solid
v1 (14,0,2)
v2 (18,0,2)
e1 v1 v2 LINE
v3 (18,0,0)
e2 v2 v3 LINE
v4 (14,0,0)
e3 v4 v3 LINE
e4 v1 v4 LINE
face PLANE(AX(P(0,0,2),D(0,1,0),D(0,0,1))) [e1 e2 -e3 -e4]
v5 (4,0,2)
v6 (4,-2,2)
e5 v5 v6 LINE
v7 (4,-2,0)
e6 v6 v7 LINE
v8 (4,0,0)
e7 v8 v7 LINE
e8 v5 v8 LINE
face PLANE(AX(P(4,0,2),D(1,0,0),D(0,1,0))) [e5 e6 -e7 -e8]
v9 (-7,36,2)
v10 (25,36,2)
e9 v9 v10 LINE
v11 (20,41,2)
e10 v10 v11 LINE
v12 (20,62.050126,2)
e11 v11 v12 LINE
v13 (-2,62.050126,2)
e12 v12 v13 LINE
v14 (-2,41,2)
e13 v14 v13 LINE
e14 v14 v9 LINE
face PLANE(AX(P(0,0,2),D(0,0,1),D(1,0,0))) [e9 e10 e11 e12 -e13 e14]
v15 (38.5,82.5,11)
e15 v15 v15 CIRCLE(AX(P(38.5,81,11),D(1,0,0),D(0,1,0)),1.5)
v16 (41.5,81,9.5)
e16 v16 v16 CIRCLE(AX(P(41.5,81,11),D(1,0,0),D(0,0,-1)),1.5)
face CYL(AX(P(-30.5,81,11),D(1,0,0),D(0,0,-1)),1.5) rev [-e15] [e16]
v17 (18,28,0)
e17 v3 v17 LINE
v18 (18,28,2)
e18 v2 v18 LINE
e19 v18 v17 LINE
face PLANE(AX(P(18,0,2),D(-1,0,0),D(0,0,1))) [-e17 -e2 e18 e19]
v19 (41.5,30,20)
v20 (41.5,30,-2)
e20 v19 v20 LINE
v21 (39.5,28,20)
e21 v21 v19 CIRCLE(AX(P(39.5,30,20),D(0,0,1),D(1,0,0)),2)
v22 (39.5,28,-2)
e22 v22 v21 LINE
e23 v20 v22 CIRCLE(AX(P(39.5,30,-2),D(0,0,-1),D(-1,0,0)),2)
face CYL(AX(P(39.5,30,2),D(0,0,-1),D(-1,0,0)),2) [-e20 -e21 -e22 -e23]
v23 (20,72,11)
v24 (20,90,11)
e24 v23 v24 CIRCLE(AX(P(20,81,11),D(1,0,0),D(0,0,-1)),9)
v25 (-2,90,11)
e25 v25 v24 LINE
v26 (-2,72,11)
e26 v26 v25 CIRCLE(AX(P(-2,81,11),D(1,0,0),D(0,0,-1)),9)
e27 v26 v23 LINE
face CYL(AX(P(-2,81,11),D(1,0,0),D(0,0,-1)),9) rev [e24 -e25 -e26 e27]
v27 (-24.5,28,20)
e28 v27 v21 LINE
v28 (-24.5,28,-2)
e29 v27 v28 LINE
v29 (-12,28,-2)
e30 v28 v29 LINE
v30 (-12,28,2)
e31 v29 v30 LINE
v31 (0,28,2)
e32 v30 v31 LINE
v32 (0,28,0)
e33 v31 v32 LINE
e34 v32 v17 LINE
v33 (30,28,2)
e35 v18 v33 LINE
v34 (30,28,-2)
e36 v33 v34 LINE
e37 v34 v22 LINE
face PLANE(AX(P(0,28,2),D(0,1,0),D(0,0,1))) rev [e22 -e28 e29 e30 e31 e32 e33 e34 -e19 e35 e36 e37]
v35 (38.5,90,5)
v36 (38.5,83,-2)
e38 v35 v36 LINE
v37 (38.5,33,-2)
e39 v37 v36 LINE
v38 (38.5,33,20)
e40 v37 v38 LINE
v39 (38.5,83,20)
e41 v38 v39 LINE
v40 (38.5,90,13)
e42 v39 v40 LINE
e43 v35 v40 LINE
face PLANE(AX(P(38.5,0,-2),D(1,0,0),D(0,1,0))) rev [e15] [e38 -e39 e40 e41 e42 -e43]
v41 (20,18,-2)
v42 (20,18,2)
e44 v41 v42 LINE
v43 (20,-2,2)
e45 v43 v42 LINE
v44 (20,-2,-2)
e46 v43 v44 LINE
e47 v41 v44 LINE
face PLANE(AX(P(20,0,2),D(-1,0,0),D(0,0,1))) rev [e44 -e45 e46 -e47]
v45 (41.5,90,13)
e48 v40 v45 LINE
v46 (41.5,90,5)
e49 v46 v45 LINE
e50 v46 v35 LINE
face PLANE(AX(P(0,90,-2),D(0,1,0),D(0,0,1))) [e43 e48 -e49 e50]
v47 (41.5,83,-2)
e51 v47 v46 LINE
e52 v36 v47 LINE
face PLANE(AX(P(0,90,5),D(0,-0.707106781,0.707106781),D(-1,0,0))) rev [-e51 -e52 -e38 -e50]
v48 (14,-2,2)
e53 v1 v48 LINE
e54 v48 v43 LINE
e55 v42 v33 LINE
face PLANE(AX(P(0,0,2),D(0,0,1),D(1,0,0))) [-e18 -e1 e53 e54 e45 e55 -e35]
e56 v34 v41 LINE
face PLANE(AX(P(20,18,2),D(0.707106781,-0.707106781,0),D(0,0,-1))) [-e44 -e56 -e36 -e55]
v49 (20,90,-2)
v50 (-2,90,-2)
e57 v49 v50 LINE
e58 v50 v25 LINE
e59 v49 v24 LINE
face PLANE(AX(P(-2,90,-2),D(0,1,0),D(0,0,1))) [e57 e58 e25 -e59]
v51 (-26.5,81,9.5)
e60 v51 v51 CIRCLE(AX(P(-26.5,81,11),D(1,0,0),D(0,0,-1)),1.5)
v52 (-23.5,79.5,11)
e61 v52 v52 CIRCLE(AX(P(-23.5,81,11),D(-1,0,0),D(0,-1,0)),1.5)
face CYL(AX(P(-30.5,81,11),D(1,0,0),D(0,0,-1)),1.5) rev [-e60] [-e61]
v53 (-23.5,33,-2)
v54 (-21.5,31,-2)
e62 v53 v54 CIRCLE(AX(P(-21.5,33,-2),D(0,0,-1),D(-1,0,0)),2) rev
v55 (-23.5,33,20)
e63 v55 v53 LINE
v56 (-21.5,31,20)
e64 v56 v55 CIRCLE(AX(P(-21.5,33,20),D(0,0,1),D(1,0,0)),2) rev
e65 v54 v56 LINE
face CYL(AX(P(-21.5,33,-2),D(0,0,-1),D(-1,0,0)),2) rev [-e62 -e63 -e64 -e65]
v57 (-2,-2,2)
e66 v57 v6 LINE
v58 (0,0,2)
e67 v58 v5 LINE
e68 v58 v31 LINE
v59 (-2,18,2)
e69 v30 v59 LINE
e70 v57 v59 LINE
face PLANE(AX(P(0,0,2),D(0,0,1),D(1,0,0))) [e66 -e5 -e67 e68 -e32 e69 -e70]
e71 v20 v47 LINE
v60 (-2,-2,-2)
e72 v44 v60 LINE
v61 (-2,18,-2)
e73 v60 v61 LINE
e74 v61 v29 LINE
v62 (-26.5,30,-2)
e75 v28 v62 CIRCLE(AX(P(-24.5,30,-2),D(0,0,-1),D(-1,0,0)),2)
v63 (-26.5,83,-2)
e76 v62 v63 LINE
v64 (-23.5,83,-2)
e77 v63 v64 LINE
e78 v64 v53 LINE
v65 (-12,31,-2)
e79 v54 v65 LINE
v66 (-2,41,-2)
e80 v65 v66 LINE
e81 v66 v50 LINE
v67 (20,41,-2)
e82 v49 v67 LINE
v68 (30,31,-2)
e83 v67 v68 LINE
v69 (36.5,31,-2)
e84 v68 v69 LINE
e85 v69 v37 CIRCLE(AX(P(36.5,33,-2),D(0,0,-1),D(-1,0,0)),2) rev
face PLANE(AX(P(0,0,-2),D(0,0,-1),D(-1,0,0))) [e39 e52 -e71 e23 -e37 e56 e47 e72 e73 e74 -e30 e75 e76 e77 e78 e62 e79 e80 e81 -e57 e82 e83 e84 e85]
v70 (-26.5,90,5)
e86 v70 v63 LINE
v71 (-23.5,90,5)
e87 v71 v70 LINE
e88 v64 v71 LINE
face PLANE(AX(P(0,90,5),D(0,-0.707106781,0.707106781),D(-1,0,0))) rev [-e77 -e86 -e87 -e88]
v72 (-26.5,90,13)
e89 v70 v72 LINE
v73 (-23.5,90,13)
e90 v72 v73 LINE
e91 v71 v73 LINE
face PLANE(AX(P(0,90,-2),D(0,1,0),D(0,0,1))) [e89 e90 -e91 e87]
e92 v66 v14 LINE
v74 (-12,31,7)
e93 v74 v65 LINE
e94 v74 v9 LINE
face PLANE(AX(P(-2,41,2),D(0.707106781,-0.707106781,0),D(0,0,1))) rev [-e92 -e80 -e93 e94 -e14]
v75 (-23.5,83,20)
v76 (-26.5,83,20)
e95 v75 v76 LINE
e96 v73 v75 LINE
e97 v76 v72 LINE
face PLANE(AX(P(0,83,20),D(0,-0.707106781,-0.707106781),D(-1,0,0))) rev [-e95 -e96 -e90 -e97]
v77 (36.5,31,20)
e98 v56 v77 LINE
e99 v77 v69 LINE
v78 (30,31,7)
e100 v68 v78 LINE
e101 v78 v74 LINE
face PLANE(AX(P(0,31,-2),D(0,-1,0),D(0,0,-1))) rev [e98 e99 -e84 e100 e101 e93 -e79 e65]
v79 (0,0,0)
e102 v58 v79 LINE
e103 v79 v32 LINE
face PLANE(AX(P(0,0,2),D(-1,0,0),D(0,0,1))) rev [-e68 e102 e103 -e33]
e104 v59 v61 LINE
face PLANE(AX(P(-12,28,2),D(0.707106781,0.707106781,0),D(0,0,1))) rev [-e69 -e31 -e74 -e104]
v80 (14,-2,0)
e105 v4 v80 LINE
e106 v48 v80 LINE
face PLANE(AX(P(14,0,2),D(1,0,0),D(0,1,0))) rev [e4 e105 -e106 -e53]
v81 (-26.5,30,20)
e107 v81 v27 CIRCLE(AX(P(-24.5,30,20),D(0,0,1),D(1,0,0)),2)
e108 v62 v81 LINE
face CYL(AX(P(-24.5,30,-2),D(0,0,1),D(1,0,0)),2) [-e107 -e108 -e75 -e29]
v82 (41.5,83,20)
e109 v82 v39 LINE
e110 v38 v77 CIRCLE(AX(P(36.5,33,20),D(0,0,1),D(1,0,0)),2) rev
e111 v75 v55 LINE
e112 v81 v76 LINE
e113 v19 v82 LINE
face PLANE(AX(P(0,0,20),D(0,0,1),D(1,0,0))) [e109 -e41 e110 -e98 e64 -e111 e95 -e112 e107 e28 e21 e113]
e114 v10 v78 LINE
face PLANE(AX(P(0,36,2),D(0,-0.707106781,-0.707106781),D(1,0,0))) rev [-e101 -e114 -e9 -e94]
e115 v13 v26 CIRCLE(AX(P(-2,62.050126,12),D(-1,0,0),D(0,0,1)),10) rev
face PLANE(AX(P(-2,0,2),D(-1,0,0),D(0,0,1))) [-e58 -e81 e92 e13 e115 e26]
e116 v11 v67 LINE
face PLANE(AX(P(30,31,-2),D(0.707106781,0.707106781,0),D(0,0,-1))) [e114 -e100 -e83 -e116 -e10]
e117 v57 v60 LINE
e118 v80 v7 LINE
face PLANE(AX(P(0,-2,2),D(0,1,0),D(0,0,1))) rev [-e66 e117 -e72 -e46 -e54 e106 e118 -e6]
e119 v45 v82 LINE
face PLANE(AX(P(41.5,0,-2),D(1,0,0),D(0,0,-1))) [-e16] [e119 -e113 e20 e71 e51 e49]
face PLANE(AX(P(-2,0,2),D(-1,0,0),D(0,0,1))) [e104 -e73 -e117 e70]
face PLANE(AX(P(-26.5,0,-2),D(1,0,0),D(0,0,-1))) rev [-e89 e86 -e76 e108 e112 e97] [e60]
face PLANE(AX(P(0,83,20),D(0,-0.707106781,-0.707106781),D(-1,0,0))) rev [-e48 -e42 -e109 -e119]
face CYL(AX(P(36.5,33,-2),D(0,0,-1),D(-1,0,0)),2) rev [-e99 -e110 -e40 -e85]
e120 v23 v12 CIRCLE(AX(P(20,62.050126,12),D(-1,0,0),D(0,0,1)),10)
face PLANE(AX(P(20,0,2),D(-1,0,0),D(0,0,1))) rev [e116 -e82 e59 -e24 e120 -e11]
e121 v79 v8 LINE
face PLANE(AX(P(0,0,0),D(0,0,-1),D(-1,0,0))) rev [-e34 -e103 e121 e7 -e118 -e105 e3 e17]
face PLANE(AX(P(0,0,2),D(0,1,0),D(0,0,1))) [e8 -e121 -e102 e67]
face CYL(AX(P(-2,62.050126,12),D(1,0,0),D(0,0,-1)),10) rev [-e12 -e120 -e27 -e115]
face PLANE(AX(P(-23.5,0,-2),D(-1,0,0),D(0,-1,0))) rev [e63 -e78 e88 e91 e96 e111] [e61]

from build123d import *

# Parameters (mm, degrees)
BOSS_EXTRUDE1_DEPTH      = 2
SKETCH2_W                = 22
SKETCH2_H                = 32
BOSS_EXTRUDE2_DEPTH      = 2
BOSS_EXTRUDE3_DEPTH      = 2
BOSS_EXTRUDE3_DEPTH_BACK = 2
SKETCH3_W                = 22
SKETCH3_H                = 60
BOSS_EXTRUDE4_DEPTH      = 18
BOSS_EXTRUDE4_DEPTH_BACK = 4
SKETCH4_W                = 21.5
SKETCH4_H                = 3
SKETCH4_W_2              = 18.5
SKETCH4_W_3              = 3
SKETCH4_H_2              = 59
BOSS_EXTRUDE5_DEPTH      = 22
FILLET1_R                = 10
CHAMFER1_SIZE            = 7
SKETCH6_R                = 1.5
CUT_EXTRUDE1_DEPTH       = 72
FILLET2_R                = 2
CHAMFER2_SIZE            = 10
CHAMFER3_SIZE            = 10
CHAMFER4_SIZE            = 5


with BuildPart() as part:
    # Sketch1 → Boss-Extrude1 (new body)
    with BuildSketch(Plane.XY):
        Polygon((-2, 30), (-2, -2), (4, -2), (4, 0), (0, 0), (0, 28), (18, 28), (18, 0), (14, 0), (14, -2), (20, -2), (20, 30), align=None)
    extrude(amount=BOSS_EXTRUDE1_DEPTH)

    # Sketch2 → Boss-Extrude2 (add)
    with BuildSketch(Plane(origin=(0, 0, 0), x_dir=(-1, 0, 0), z_dir=(0, 0, -1))):
        with Locations((-9, 14)):
            Rectangle(SKETCH2_W, SKETCH2_H)
    extrude(amount=BOSS_EXTRUDE2_DEPTH)

    # Sketch3 → Boss-Extrude3 (add, two sides: drawn at the far end of the back side and taken through both)
    with BuildSketch(Plane.XY.offset(-BOSS_EXTRUDE3_DEPTH_BACK)):
        with Locations((9, 60)):
            Rectangle(SKETCH3_W, SKETCH3_H)
    extrude(amount=BOSS_EXTRUDE3_DEPTH + BOSS_EXTRUDE3_DEPTH_BACK)

    # Sketch4 → Boss-Extrude4 (add, two sides: drawn at the far end of the back side and taken through both)
    with BuildSketch(Plane.XY.offset(2).offset(-BOSS_EXTRUDE4_DEPTH_BACK)):
        Polygon((-23.5, 28), (-23.5, 31), (-23.5, 90), (-26.5, 90), (-26.5, 28), align=None)
        with Locations((-12.75, 29.5)):
            Rectangle(SKETCH4_W, SKETCH4_H)
        with Locations((29.25, 29.5)):
            Rectangle(SKETCH4_W_2, SKETCH4_H)
        with Locations((40, 60.5)):
            Rectangle(SKETCH4_W_3, SKETCH4_H_2)
        Polygon((20, 31), (-2, 31), (-2, 28), (0, 28), (18, 28), (20, 28), align=None)
        with Locations((40, 29.5)):
            Rectangle(SKETCH4_W_3, SKETCH4_H)
    extrude(amount=BOSS_EXTRUDE4_DEPTH + BOSS_EXTRUDE4_DEPTH_BACK)

    # Sketch5 → Boss-Extrude5 (add)
    with BuildSketch(Plane(origin=(20, 0, 0), x_dir=(0, 0, -1), z_dir=(1, 0, 0))):
        with BuildLine():
            ThreePointArc((-2, 81), (-4.636038969, 74.636038969), (-11, 72))
            Line((-11, 72), (-2, 72))
            Line((-2, 72), (-2, 81))
        make_face()
        with BuildLine():
            Line((-2, 90), (-11, 90))
            ThreePointArc((-11, 90), (-4.636038969, 87.363961031), (-2, 81))
            Line((-2, 81), (-2, 90))
        make_face()
    extrude(amount=-BOSS_EXTRUDE5_DEPTH)

    # Fillet1
    # the kernel refuses this fillet: 10 mm, written as the material it adds along each edge
    with BuildSketch(Plane(origin=(20, 72, 2), x_dir=(0, 0, 1), z_dir=(-1, 0, 0))) as fillet1_piece_1_section:
        with BuildLine():
            CenterArc((10, -9.949874371), FILLET1_R, 95.739170477, 84.260829523)
            Line((0, -9.949874371), (-0.2, -9.949874371))
            Line((-0.2, -9.949874371), (-0.2, 0))
            Line((-0.2, 0), (0, 0.2))
            ThreePointArc((0, 0.2), (4.5, 0.2), (8.98, 0.198997487))
            Line((8.98, 0.198997487), (9, 0))
        make_face()
    fillet1_piece_1 = extrude(amount=22, mode=Mode.PRIVATE)
    fillet1_piece_1 = fillet1_piece_1 - Plane(origin=(9, 81, 11), x_dir=(0, 0, -1), z_dir=(1, 0, 0)) * Cylinder(9, 84, mode=Mode.PRIVATE)
    add(fillet1_piece_1)

    # Chamfer1
    chamfer1_edges = [part.edges().sort_by_distance(p)[0] for p in [
        (40, 90, -2),
        (-25, 90, -2),
        (-25, 90, 20),
        (40, 90, 20),
    ]]
    chamfer(chamfer1_edges, length=CHAMFER1_SIZE)

    # Sketch6 → Cut-Extrude1 (cut)
    with BuildSketch(Plane(origin=(41.5, 0, 0), x_dir=(0, 0, -1), z_dir=(1, 0, 0))):
        with Locations((-11, 81)):
            Circle(SKETCH6_R)
    extrude(amount=-CUT_EXTRUDE1_DEPTH, mode=Mode.SUBTRACT)

    # Fillet2
    fillet2_edges = [part.edges().sort_by_distance(p)[0] for p in [
        (38.5, 31, 9),
        (41.5, 28, 9),
        (-26.5, 28, 9),
        (-23.5, 31, 9),
    ]]
    fillet(fillet2_edges, radius=FILLET2_R)

    # Chamfer2
    chamfer2_edges = [part.edges().sort_by_distance(p)[0] for p in [
        (20, 28, 0),
        (-2, 28, 0),
    ]]
    chamfer(chamfer2_edges, length=CHAMFER2_SIZE)

    # Chamfer3
    chamfer3_edges = [part.edges().sort_by_distance(p)[0] for p in [
        (-2, 31, 0),
        (20, 31, 0),
    ]]
    chamfer(chamfer3_edges, length=CHAMFER3_SIZE)

    # Chamfer4
    chamfer4_edges = [part.edges().sort_by_distance(p)[0] for p in [
        (9, 31, 2),
    ]]
    chamfer(chamfer4_edges, length=CHAMFER4_SIZE)


solid = part.part
